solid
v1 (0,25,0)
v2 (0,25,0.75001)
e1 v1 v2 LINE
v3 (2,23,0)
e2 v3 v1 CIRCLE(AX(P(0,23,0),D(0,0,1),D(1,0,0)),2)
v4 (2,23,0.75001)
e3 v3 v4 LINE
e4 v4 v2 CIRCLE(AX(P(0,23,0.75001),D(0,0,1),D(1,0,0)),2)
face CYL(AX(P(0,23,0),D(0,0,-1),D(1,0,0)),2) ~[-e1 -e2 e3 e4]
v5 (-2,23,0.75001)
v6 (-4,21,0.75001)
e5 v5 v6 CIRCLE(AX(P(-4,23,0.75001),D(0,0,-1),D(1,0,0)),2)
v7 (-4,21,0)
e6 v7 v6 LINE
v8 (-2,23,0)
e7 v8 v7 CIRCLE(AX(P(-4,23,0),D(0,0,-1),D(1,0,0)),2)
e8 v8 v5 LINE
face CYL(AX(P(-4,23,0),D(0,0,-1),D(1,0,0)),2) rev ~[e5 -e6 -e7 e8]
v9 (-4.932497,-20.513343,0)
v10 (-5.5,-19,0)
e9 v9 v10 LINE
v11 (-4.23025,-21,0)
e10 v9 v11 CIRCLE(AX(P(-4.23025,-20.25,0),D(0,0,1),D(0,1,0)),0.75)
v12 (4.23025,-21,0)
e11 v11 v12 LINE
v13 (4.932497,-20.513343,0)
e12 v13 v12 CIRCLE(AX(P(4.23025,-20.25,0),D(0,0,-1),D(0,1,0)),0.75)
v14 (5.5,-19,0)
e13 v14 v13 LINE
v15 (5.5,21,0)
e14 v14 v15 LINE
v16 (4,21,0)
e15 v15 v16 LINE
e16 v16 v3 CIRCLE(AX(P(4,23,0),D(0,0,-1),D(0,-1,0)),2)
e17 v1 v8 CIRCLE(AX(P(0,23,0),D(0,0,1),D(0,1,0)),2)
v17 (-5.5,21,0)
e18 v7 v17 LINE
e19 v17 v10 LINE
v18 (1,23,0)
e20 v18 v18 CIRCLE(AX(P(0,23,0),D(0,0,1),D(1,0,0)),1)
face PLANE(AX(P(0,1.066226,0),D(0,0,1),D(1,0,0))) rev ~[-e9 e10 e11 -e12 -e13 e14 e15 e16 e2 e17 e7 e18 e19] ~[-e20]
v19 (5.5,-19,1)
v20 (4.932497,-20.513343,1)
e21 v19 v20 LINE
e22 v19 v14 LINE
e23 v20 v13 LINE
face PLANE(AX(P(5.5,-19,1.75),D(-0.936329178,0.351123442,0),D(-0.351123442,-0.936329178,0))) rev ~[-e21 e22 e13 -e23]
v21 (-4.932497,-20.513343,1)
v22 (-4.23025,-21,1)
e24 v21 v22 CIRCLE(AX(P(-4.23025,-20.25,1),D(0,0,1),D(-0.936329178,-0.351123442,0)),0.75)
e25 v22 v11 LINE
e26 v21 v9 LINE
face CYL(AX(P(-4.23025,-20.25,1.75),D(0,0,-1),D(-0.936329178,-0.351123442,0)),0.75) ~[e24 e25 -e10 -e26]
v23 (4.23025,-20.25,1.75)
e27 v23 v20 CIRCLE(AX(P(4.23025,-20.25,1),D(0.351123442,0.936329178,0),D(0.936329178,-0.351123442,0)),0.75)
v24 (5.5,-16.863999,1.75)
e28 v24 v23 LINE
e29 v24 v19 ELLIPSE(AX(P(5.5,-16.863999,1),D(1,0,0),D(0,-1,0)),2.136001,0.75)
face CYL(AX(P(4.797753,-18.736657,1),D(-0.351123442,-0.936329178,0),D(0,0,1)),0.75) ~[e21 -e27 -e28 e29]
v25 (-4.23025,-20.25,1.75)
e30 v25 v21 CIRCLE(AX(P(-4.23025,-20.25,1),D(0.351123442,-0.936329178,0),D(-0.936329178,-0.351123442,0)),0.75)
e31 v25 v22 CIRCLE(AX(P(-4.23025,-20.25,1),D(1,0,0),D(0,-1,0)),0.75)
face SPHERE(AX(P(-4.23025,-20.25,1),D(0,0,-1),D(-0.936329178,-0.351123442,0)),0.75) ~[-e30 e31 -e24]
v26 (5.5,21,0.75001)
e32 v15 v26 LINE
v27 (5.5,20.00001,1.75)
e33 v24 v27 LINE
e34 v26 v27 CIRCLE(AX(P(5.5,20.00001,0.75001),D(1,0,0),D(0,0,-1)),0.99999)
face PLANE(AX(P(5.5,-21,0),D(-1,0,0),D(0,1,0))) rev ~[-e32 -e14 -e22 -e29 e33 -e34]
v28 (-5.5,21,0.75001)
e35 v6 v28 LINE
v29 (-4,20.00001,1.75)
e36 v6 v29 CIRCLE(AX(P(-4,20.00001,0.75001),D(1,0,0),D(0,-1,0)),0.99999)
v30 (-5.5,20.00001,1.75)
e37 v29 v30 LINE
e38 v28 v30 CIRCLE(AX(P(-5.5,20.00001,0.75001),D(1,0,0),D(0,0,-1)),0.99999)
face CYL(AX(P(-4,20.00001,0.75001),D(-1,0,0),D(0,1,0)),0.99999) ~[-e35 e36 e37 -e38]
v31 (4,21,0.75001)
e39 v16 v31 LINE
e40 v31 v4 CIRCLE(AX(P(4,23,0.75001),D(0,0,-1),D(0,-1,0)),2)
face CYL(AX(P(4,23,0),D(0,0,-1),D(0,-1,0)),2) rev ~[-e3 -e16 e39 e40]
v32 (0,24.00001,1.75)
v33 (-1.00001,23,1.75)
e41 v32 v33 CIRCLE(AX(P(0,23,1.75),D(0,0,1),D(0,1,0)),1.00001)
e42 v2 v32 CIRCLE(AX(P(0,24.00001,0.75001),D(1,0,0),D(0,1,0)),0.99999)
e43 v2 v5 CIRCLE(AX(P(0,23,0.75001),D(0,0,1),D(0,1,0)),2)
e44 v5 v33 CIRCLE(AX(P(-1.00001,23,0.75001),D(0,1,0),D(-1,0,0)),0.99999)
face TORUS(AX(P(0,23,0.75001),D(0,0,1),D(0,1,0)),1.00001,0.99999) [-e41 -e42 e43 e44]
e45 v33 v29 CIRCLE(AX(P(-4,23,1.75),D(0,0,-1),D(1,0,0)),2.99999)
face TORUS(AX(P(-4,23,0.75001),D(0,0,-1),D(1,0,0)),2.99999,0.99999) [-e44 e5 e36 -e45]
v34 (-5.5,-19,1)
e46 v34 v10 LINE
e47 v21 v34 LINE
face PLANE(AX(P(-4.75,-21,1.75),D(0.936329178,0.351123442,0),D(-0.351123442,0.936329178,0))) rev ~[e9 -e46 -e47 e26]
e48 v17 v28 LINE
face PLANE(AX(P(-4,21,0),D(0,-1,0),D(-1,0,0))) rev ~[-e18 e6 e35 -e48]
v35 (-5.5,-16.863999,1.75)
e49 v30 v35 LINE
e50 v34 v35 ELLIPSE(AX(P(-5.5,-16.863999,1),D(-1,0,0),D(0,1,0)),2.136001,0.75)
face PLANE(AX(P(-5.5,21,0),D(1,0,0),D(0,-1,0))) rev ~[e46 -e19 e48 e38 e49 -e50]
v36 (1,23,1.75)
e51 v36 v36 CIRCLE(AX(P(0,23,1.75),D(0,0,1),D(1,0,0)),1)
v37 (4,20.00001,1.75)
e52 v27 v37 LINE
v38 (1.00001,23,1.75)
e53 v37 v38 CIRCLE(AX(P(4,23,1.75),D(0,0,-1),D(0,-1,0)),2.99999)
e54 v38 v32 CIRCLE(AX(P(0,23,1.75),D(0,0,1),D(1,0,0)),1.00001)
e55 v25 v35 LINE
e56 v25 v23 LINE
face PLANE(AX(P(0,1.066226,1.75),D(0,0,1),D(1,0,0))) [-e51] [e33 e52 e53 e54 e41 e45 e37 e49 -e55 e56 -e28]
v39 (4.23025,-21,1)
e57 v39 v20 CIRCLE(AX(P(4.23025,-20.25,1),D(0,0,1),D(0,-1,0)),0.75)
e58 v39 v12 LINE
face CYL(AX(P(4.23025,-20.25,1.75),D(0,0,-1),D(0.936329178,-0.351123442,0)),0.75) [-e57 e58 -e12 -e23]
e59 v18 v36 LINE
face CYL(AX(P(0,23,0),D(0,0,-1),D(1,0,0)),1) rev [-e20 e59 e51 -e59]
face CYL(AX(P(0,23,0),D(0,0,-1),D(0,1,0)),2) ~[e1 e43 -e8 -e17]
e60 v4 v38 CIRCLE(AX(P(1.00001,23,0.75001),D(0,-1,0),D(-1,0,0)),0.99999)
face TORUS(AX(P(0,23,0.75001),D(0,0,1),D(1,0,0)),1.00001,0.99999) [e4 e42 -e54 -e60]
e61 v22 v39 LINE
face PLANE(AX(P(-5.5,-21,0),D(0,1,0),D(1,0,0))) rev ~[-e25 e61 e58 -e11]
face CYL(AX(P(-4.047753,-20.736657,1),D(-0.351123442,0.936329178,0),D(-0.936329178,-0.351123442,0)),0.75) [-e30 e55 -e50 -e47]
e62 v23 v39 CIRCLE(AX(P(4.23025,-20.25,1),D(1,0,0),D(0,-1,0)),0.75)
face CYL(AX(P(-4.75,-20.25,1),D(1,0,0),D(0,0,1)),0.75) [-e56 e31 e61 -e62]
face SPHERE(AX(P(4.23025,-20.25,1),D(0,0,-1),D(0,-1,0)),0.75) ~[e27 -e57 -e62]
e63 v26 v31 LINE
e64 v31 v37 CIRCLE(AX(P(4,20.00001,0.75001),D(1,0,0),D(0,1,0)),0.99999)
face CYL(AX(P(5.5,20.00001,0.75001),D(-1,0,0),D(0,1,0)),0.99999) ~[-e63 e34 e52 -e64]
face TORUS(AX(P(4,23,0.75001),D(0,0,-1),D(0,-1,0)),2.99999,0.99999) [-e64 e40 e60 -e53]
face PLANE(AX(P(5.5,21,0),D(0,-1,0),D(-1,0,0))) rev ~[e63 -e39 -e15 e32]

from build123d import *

# Parameters (mm, degrees)
F0_R     = 1
F1_DEPTH = 1.75
F2_R     = 0.99999
F4_DEPTH = 25
F5_R     = 0.75


# Not quite as in the source:
# - a fillet or chamfer is up to 0.001 mm smaller than in the source, because OpenCascade refuses the exact size


with BuildPart() as f1:
    # F0 (on Top) → F1 (new body)
    with BuildSketch(Plane.XY):
        with BuildLine():
            Line((-5.5, -21), (5.5, -21))
            Line((5.5, -21), (5.5, 21))
            Line((5.5, 21), (4, 21))
            ThreePointArc((4, 21), (2.5857864376, 21.5857864376), (2, 23))
            ThreePointArc((2, 23), (1.4142135624, 24.4142135624), (0, 25))
            ThreePointArc((0, 25), (-1.4142135624, 24.4142135624), (-2, 23))
            ThreePointArc((-2, 23), (-2.5857864376, 21.5857864376), (-4, 21))
            Line((-4, 21), (-5.5, 21))
            Line((-5.5, 21), (-5.5, -21))
        make_face()
        with Locations((0, 23)):
            Circle(F0_R, mode=Mode.SUBTRACT)
    extrude(amount=F1_DEPTH)

    # F2 (radius 1 in the source; OpenCascade refuses exactly that, so slightly less here)
    f2_edges = [f1.edges().sort_by_distance(p)[0] for p in [
        (-2.585786, 21.585786, 1.75),
    ]]
    fillet(f2_edges, radius=F2_R)

    # F3 (on face) → F4 (cut)
    with BuildSketch(Plane.XY.offset(1.75)):
        Polygon((-5.5, -21), (-4.75, -21), (-5.5, -19), align=None)
        Polygon((5.5, -19), (4.75, -21), (5.5, -21), align=None)
    extrude(amount=-F4_DEPTH, mode=Mode.SUBTRACT)

    # F5
    f5_edges = [f1.edges().sort_by_distance(p)[0] for p in [
        (-5.125, -20, 1.75),
        (0, -21, 1.75),
        (5.125, -20, 1.75),
        (-4.75, -21, 0.875),
        (4.75, -21, 0.875),
    ]]
    fillet(f5_edges, radius=F5_R)


solid = f1.part
